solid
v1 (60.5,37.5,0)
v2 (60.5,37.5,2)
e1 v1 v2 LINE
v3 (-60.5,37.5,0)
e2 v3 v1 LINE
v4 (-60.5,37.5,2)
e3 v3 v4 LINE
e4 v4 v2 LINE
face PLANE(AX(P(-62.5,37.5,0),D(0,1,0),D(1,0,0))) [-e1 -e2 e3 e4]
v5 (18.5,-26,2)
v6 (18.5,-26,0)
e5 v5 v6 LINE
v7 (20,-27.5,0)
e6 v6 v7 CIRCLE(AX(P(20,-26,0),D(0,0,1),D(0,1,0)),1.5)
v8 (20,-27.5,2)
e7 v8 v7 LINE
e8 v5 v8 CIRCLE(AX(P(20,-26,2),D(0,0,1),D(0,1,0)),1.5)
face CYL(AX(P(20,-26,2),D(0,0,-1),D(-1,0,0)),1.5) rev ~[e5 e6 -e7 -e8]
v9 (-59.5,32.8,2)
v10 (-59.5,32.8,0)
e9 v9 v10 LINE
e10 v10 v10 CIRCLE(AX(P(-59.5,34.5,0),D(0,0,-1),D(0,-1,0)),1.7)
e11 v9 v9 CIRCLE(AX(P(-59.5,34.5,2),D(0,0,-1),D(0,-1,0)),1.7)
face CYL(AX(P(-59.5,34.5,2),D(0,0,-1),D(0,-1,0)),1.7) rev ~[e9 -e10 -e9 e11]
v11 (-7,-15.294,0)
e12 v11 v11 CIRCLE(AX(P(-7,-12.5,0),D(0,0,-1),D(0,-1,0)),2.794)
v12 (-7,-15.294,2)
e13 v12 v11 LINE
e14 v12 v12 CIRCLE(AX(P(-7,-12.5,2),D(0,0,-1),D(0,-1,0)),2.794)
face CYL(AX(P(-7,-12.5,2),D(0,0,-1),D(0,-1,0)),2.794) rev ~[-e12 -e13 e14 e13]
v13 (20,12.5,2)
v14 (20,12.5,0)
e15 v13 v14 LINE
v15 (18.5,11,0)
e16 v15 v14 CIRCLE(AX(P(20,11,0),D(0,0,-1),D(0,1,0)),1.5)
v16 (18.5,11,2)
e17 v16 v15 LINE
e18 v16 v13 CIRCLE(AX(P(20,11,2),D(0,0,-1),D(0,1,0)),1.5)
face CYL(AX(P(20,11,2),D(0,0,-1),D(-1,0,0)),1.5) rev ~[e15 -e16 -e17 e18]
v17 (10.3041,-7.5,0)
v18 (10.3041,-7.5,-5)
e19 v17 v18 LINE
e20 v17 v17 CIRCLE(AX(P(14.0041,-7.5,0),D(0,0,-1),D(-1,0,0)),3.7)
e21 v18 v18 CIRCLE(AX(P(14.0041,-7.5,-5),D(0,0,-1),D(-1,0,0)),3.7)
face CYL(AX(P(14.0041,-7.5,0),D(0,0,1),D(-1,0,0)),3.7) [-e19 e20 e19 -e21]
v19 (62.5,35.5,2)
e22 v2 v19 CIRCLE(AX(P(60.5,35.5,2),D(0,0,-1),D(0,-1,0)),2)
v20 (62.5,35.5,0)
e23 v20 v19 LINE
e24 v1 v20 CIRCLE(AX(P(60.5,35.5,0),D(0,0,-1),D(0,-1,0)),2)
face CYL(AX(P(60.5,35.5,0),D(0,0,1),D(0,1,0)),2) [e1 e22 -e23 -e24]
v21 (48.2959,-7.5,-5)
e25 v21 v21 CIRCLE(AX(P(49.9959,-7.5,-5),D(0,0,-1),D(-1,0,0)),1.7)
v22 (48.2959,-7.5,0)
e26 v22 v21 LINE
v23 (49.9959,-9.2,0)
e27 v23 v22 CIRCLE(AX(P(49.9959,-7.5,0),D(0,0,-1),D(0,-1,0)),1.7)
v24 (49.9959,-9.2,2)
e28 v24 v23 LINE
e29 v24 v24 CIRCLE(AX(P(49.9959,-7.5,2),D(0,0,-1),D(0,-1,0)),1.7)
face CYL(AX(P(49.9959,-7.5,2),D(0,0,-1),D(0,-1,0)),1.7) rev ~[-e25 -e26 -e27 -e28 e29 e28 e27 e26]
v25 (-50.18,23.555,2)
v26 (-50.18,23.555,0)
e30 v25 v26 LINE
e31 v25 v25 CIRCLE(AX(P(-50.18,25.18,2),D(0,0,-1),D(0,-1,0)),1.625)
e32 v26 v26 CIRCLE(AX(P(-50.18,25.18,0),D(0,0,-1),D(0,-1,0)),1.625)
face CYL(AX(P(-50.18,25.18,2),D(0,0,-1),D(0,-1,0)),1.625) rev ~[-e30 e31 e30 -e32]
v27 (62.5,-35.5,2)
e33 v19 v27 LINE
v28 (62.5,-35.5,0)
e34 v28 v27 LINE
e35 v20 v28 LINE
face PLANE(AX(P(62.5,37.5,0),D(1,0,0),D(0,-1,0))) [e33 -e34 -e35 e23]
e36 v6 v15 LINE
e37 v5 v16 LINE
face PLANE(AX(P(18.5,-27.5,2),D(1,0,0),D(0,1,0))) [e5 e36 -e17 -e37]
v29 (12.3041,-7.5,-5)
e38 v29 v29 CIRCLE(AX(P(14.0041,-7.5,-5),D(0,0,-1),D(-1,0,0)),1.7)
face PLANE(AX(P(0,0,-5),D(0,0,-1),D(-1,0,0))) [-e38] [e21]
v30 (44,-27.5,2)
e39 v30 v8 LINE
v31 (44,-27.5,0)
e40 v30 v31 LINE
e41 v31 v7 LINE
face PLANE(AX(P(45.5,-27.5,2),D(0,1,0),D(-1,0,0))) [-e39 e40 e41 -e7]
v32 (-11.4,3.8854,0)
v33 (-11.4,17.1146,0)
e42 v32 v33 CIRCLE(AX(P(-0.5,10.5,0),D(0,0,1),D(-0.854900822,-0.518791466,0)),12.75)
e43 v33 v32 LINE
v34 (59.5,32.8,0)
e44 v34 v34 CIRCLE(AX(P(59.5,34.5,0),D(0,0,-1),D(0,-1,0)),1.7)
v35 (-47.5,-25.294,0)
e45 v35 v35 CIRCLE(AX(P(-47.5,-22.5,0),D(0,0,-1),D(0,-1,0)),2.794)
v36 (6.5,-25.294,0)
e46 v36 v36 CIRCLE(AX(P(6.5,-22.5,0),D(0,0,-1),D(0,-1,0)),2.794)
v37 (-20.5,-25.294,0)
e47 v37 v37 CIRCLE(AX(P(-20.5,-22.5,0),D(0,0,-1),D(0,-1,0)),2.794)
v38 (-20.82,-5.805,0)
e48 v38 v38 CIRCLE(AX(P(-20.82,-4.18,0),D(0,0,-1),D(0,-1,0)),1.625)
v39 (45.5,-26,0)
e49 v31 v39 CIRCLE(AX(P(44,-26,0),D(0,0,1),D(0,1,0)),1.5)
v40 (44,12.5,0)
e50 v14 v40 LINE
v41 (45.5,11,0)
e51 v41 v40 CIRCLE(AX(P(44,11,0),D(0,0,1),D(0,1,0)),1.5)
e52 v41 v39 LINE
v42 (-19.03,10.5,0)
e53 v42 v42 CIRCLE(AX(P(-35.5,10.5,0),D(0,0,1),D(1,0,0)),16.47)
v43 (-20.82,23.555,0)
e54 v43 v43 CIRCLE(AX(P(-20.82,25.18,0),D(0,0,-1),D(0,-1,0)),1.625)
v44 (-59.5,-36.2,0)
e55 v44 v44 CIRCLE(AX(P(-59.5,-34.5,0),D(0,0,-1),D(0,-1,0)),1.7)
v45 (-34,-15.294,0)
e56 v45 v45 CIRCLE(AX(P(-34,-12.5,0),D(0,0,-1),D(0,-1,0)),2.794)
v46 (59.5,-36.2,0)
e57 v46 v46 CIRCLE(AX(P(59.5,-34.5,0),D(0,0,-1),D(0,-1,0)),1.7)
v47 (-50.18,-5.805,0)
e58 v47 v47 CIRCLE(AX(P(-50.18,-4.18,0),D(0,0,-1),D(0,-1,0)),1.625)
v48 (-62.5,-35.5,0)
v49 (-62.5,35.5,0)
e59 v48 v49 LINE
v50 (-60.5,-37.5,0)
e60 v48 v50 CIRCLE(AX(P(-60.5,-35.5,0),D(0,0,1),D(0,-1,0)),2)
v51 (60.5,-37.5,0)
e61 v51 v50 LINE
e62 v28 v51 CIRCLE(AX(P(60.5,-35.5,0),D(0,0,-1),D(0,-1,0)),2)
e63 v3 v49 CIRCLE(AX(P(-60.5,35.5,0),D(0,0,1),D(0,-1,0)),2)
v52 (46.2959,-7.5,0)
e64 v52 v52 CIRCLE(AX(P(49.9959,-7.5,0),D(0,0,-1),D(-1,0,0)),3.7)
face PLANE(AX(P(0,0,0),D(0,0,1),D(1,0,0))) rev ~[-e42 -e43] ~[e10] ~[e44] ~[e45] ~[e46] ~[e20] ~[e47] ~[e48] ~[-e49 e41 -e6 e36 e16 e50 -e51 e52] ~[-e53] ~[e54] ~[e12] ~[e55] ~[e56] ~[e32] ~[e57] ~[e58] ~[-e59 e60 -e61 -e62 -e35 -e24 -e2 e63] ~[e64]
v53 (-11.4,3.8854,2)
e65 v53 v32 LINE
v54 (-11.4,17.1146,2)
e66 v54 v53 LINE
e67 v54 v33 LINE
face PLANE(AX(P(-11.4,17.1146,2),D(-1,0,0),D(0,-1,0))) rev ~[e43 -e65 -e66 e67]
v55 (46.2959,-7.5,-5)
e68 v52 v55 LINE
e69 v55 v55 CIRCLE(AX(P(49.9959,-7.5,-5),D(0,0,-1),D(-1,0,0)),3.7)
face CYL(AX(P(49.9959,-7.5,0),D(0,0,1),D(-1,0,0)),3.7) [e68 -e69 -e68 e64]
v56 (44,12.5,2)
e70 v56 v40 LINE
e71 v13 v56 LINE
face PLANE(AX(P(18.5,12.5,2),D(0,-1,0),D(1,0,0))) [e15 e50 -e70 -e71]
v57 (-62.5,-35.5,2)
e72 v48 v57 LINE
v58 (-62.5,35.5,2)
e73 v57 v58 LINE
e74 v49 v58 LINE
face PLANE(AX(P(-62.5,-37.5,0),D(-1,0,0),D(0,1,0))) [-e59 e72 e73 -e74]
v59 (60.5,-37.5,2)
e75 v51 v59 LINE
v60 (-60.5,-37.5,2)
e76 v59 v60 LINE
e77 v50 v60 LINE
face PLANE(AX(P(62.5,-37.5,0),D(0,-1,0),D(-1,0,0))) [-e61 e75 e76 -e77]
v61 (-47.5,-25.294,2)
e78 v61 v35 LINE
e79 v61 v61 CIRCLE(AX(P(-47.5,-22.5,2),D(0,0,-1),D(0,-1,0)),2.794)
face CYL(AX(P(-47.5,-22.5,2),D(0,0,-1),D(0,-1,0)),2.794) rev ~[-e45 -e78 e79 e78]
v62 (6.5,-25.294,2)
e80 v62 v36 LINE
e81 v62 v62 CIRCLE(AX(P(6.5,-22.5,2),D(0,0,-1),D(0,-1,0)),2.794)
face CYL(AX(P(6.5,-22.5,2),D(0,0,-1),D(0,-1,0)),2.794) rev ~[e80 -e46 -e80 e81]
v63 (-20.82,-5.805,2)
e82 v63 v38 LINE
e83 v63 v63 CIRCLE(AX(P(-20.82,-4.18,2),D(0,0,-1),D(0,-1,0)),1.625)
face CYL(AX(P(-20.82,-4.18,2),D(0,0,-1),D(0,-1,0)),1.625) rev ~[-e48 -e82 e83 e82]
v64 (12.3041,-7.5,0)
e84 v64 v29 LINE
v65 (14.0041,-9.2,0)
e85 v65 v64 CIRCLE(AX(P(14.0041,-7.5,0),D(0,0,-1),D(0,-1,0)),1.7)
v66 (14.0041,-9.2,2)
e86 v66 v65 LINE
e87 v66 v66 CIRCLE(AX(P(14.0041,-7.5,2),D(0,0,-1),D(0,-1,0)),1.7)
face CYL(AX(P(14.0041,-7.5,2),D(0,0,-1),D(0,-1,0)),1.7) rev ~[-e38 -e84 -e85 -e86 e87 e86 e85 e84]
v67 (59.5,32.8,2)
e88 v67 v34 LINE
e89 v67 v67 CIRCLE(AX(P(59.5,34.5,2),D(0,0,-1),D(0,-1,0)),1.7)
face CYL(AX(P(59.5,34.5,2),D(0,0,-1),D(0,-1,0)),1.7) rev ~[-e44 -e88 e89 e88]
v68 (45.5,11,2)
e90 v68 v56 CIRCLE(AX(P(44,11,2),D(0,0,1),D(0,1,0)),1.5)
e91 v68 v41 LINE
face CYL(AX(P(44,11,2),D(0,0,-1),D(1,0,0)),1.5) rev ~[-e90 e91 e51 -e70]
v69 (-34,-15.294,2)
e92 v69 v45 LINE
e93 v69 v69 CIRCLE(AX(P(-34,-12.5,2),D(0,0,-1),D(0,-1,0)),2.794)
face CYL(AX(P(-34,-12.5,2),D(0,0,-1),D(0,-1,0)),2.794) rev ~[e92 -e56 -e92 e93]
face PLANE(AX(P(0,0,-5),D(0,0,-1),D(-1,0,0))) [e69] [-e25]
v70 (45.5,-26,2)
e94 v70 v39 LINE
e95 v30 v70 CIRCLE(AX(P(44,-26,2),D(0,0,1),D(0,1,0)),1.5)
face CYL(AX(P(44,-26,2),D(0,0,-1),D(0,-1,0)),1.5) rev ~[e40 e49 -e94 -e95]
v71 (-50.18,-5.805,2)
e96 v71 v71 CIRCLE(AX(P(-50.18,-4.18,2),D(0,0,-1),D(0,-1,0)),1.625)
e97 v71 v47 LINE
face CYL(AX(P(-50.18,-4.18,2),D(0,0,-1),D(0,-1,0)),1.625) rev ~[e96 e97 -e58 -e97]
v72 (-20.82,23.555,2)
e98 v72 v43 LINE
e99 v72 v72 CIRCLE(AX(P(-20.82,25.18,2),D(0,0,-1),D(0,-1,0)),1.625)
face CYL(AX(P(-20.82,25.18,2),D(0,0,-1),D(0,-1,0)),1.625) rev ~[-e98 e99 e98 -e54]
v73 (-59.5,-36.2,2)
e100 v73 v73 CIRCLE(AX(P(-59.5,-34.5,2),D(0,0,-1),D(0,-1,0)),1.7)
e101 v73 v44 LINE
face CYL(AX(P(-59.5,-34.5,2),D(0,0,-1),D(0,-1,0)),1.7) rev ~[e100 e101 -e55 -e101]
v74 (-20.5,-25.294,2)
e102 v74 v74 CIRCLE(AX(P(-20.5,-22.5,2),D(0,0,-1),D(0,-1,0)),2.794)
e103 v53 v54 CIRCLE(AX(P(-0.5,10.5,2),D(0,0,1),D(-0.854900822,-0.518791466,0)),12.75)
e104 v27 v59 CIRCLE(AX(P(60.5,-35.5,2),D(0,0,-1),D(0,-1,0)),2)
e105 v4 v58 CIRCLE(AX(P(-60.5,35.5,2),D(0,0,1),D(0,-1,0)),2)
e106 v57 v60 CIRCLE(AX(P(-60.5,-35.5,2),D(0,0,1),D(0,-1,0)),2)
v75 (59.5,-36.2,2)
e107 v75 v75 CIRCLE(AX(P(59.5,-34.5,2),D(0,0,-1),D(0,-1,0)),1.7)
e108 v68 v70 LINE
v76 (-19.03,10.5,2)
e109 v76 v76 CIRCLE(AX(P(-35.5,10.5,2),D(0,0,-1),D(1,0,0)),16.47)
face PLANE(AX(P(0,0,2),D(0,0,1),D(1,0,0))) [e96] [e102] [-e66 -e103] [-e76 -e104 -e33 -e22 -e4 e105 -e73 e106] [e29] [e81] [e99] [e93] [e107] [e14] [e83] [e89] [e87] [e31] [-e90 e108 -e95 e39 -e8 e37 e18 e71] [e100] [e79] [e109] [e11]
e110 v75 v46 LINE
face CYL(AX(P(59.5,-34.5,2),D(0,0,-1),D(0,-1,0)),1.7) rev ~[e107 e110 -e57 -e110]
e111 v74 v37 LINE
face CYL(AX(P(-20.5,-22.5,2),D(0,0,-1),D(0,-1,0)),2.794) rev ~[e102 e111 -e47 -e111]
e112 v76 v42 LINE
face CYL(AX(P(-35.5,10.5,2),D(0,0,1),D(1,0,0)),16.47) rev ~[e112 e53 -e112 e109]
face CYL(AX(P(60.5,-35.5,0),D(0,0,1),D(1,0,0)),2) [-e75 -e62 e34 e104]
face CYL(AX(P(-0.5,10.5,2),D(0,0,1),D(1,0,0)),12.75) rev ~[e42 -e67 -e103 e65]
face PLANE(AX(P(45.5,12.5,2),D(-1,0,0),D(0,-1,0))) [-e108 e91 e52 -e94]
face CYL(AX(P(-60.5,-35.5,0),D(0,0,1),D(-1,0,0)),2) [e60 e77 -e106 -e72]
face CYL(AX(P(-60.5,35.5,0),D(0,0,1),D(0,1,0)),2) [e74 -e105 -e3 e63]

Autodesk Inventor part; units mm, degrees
ref_plane "YZ Plane" through (0, 0, 0) normal (1, 0, 0) x (0, 1, 0)
ref_plane "XZ Plane" through (0, 0, 0) normal (0, 1, 0) x (-1, 0, 0)
ref_plane "XY Plane" through (0, 0, 0) normal (0, 0, 1) x (1, 0, 0)
sketch "Sketch1" plane through (0, 0, 0) normal (0, 0, 1) x (1, 0, 0)
  line L0 (-62.5, 37.5) -> (62.5, 37.5)
  line L1 (62.5, 37.5) -> (62.5, -37.5)
  line L2 (62.5, -37.5) -> (-62.5, -37.5)
  line L3 (-62.5, -37.5) -> (-62.5, 37.5)
  point P0 (0, 0)
  point P1 (-62.5, 0)
  point P2 (0, 37.5)
  dimension "d0" = 125
  dimension "d1" = 75
extrude "Extrusion1" add sketch "Sketch1" along normal blind 2
sketch "Sketch2" plane through (0, 0, 2) normal (0, 0, 1) x (1, 0, 0)
  line L0 (-62.5, -37.5) -> (62.5, -37.5) projected
  line L1 (62.5, -37.5) -> (62.5, 37.5) projected
  line L2 (62.5, 37.5) -> (-62.5, 37.5) projected
  line L3 (-62.5, 37.5) -> (-62.5, -37.5) projected
  line L4 (-59.5, 34.5) -> (59.5, 34.5)
  line L5 (59.5, 34.5) -> (59.5, -34.5)
  line L6 (59.5, -34.5) -> (-59.5, -34.5)
  line L7 (-59.5, -34.5) -> (-59.5, 34.5)
  point P0 (0, 0)
  dimension "d4" = 3
hole "Hole1" at (-59.5, 34.5, 2) at (59.5, 34.5, 2) at (-59.5, -34.5, 2) at (59.5, -34.5, 2) direction (0, 0, -1) diameter 3.4 end through all clearance for "Oval Head Machine Screw" size "M3" standard "Ansi Metric M Profile"
fillet "Fillet1" radius 2 4 edges at (-62.5, 37.5, 1) (-62.5, -37.5, 1) (62.5, -37.5, 1) (62.5, 37.5, 1)
sketch "Sketch3" plane through (0, 0, 2) normal (0, 0, 1) x (1, 0, 0)
  line L0 (18.5, 12.5) -> (45.5, 12.5)
  line L1 (45.5, 12.5) -> (45.5, -27.5)
  line L2 (45.5, -27.5) -> (18.5, -27.5)
  line L3 (18.5, -27.5) -> (18.5, 12.5)
  line L4 (62.5, -35.5) -> (62.5, 35.5) projected
  line L5 (60.5, 37.5) -> (-60.5, 37.5) projected
  point P0 (0, 0)
  dimension "d13" = 27
  dimension "d14" = 40
  dimension "d16" = 17
  dimension "d73" = 25
extrude "Extrusion2" cut sketch "Sketch3" against normal through all
fillet "Fillet2" radius 1.5 4 edges at (18.5, -27.5, 1) (18.5, 12.5, 1) (45.5, 12.5, 1) (45.5, -27.5, 1)
sketch "Sketch4" plane through (0, 0, 2) normal (0, 0, 1) x (1, 0, 0)
  line L0 (44, 12.5) -> (20, 12.5) projected
  line L1 (44, -27.5) -> (20, -27.5) projected
  line L2 (18.5, -26) -> (18.5, 11) projected
  line L3 (20, 12.5) -> (44, 12.5) projected
  line L4 (45.5, 11) -> (45.5, -26) projected
  line L5 (14.0041, -17.1435) -> (14.0041, 2.1435)
  line L6 (49.9959, 2.1435) -> (49.9959, -17.1435)
  line L7 (32, 12.5) -> (32, -27.5)
  point P0 (0, 0)
  point P1 (14.0041, -7.5)
  point P2 (49.9959, -7.5)
  point P3 (18.5, -7.5)
  point P4 (45.5, -7.5)
  dimension "d21" = 35.9918
hole "Hole2" at (14.0041, -7.5, 2) at (49.9959, -7.5, 2) direction (0, 0, -1) diameter 3.4 depth 6 tip angle 118 clearance for "Oval Head Machine Screw" size "M3" standard "Ansi Metric M Profile"
sketch "Sketch6" plane through (0, 0, 2) normal (0, 0, 1) x (1, 0, 0)
  circle A0 centre (-0.5, 10.5) radius 12.75
  line L0 (-11.4, 17.1146) -> (-11.4, 3.8854)
  line L1 (-62.5, 35.5) -> (-62.5, -35.5) projected
  line L2 (60.5, 37.5) -> (-60.5, 37.5) projected
  point P0 (0, 0)
  dimension "d35" = 25.5
  dimension "d36" = 10.9
  dimension "d74" = 62
  dimension "d75" = 27
extrude "Extrusion4" cut sketch "Sketch6" against normal blind 10 contours A0 L0 picked at (-2.2841, 10.5)
sketch "Sketch7" plane through (0, 0, 2) normal (0, 0, 1) x (1, 0, 0)
  line L0 (-47.5, -22.5) -> (6.5, -22.5)
  line L1 (-62.5, 35.5) -> (-62.5, -35.5) projected
  line L2 (-60.5, -37.5) -> (60.5, -37.5) projected
  line L3 (-34, -12.5) -> (-7, -12.5)
  point P0 (0, 0)
  point P1 (-20.5, -22.5)
  point P2 (-20.5, -12.5)
  dimension "d40" = 54
  dimension "d43" = 15
  dimension "d56" = 15
  dimension "d57" = 10
  dimension "d58" = 27
hole "Hole3" at (-47.5, -22.5, 2) at (6.5, -22.5, 2) at (-20.5, -22.5, 2) at (-34, -12.5, 2) at (-7, -12.5, 2) direction (0, 0, -1) diameter 5.588 end through all thread size "1/4-36 UNS" class "2B" standard "ANSI Unified Screw Threads"
sketch "Sketch8" plane through (0, 0, 0) normal (0, 0, -1) x (-1, 0, 0)
  circle A0 centre (-49.9959, -7.5) radius 1.7 projected
  circle A1 centre (-14.0041, -7.5) radius 1.7 projected
  circle A2 centre (-49.9959, -7.5) radius 3.7
  circle A3 centre (-14.0041, -7.5) radius 3.7
  point P0 (0, 0)
  dimension "d52" = 2
  dimension "d53" = 2
extrude "Extrusion5" add sketch "Sketch8" along normal blind 5
sketch "Sketch9" plane through (0, 0, 2) normal (0, 0, 1) x (1, 0, 0)
  circle A0 centre (-35.5, 10.5) radius 16.47
  line L0 (60.5, 37.5) -> (-60.5, 37.5) projected
  line L1 (-62.5, 35.5) -> (-62.5, -35.5) projected
  line L2 (-50.18, 25.18) -> (-20.82, 25.18)
  line L3 (-20.82, 25.18) -> (-20.82, -4.18)
  line L4 (-20.82, -4.18) -> (-50.18, -4.18)
  line L5 (-50.18, -4.18) -> (-50.18, 25.18)
  point P0 (0, 0)
  point P1 (-20.82, 10.5)
  point P2 (-35.5, 25.18)
  dimension "d59" = 32.94
  dimension "d60" = 27
  dimension "d61" = 27
  dimension "d62" = 29.36
  dimension "d63" = 29.36
extrude "Extrusion6" cut sketch "Sketch9" against normal blind 10 contours A0 L3 | L3 A0 L4 L5 L2 | L2 A0 | A0 L4 | L5 A0
hole "Hole4" at (-50.18, 25.18, 2) at (-20.82, 25.18, 2) at (-50.18, -4.18, 2) at (-20.82, -4.18, 2) direction (0, 0, -1) diameter 3.25 end through all
properties part number "LI0011-IO SHIELD"
